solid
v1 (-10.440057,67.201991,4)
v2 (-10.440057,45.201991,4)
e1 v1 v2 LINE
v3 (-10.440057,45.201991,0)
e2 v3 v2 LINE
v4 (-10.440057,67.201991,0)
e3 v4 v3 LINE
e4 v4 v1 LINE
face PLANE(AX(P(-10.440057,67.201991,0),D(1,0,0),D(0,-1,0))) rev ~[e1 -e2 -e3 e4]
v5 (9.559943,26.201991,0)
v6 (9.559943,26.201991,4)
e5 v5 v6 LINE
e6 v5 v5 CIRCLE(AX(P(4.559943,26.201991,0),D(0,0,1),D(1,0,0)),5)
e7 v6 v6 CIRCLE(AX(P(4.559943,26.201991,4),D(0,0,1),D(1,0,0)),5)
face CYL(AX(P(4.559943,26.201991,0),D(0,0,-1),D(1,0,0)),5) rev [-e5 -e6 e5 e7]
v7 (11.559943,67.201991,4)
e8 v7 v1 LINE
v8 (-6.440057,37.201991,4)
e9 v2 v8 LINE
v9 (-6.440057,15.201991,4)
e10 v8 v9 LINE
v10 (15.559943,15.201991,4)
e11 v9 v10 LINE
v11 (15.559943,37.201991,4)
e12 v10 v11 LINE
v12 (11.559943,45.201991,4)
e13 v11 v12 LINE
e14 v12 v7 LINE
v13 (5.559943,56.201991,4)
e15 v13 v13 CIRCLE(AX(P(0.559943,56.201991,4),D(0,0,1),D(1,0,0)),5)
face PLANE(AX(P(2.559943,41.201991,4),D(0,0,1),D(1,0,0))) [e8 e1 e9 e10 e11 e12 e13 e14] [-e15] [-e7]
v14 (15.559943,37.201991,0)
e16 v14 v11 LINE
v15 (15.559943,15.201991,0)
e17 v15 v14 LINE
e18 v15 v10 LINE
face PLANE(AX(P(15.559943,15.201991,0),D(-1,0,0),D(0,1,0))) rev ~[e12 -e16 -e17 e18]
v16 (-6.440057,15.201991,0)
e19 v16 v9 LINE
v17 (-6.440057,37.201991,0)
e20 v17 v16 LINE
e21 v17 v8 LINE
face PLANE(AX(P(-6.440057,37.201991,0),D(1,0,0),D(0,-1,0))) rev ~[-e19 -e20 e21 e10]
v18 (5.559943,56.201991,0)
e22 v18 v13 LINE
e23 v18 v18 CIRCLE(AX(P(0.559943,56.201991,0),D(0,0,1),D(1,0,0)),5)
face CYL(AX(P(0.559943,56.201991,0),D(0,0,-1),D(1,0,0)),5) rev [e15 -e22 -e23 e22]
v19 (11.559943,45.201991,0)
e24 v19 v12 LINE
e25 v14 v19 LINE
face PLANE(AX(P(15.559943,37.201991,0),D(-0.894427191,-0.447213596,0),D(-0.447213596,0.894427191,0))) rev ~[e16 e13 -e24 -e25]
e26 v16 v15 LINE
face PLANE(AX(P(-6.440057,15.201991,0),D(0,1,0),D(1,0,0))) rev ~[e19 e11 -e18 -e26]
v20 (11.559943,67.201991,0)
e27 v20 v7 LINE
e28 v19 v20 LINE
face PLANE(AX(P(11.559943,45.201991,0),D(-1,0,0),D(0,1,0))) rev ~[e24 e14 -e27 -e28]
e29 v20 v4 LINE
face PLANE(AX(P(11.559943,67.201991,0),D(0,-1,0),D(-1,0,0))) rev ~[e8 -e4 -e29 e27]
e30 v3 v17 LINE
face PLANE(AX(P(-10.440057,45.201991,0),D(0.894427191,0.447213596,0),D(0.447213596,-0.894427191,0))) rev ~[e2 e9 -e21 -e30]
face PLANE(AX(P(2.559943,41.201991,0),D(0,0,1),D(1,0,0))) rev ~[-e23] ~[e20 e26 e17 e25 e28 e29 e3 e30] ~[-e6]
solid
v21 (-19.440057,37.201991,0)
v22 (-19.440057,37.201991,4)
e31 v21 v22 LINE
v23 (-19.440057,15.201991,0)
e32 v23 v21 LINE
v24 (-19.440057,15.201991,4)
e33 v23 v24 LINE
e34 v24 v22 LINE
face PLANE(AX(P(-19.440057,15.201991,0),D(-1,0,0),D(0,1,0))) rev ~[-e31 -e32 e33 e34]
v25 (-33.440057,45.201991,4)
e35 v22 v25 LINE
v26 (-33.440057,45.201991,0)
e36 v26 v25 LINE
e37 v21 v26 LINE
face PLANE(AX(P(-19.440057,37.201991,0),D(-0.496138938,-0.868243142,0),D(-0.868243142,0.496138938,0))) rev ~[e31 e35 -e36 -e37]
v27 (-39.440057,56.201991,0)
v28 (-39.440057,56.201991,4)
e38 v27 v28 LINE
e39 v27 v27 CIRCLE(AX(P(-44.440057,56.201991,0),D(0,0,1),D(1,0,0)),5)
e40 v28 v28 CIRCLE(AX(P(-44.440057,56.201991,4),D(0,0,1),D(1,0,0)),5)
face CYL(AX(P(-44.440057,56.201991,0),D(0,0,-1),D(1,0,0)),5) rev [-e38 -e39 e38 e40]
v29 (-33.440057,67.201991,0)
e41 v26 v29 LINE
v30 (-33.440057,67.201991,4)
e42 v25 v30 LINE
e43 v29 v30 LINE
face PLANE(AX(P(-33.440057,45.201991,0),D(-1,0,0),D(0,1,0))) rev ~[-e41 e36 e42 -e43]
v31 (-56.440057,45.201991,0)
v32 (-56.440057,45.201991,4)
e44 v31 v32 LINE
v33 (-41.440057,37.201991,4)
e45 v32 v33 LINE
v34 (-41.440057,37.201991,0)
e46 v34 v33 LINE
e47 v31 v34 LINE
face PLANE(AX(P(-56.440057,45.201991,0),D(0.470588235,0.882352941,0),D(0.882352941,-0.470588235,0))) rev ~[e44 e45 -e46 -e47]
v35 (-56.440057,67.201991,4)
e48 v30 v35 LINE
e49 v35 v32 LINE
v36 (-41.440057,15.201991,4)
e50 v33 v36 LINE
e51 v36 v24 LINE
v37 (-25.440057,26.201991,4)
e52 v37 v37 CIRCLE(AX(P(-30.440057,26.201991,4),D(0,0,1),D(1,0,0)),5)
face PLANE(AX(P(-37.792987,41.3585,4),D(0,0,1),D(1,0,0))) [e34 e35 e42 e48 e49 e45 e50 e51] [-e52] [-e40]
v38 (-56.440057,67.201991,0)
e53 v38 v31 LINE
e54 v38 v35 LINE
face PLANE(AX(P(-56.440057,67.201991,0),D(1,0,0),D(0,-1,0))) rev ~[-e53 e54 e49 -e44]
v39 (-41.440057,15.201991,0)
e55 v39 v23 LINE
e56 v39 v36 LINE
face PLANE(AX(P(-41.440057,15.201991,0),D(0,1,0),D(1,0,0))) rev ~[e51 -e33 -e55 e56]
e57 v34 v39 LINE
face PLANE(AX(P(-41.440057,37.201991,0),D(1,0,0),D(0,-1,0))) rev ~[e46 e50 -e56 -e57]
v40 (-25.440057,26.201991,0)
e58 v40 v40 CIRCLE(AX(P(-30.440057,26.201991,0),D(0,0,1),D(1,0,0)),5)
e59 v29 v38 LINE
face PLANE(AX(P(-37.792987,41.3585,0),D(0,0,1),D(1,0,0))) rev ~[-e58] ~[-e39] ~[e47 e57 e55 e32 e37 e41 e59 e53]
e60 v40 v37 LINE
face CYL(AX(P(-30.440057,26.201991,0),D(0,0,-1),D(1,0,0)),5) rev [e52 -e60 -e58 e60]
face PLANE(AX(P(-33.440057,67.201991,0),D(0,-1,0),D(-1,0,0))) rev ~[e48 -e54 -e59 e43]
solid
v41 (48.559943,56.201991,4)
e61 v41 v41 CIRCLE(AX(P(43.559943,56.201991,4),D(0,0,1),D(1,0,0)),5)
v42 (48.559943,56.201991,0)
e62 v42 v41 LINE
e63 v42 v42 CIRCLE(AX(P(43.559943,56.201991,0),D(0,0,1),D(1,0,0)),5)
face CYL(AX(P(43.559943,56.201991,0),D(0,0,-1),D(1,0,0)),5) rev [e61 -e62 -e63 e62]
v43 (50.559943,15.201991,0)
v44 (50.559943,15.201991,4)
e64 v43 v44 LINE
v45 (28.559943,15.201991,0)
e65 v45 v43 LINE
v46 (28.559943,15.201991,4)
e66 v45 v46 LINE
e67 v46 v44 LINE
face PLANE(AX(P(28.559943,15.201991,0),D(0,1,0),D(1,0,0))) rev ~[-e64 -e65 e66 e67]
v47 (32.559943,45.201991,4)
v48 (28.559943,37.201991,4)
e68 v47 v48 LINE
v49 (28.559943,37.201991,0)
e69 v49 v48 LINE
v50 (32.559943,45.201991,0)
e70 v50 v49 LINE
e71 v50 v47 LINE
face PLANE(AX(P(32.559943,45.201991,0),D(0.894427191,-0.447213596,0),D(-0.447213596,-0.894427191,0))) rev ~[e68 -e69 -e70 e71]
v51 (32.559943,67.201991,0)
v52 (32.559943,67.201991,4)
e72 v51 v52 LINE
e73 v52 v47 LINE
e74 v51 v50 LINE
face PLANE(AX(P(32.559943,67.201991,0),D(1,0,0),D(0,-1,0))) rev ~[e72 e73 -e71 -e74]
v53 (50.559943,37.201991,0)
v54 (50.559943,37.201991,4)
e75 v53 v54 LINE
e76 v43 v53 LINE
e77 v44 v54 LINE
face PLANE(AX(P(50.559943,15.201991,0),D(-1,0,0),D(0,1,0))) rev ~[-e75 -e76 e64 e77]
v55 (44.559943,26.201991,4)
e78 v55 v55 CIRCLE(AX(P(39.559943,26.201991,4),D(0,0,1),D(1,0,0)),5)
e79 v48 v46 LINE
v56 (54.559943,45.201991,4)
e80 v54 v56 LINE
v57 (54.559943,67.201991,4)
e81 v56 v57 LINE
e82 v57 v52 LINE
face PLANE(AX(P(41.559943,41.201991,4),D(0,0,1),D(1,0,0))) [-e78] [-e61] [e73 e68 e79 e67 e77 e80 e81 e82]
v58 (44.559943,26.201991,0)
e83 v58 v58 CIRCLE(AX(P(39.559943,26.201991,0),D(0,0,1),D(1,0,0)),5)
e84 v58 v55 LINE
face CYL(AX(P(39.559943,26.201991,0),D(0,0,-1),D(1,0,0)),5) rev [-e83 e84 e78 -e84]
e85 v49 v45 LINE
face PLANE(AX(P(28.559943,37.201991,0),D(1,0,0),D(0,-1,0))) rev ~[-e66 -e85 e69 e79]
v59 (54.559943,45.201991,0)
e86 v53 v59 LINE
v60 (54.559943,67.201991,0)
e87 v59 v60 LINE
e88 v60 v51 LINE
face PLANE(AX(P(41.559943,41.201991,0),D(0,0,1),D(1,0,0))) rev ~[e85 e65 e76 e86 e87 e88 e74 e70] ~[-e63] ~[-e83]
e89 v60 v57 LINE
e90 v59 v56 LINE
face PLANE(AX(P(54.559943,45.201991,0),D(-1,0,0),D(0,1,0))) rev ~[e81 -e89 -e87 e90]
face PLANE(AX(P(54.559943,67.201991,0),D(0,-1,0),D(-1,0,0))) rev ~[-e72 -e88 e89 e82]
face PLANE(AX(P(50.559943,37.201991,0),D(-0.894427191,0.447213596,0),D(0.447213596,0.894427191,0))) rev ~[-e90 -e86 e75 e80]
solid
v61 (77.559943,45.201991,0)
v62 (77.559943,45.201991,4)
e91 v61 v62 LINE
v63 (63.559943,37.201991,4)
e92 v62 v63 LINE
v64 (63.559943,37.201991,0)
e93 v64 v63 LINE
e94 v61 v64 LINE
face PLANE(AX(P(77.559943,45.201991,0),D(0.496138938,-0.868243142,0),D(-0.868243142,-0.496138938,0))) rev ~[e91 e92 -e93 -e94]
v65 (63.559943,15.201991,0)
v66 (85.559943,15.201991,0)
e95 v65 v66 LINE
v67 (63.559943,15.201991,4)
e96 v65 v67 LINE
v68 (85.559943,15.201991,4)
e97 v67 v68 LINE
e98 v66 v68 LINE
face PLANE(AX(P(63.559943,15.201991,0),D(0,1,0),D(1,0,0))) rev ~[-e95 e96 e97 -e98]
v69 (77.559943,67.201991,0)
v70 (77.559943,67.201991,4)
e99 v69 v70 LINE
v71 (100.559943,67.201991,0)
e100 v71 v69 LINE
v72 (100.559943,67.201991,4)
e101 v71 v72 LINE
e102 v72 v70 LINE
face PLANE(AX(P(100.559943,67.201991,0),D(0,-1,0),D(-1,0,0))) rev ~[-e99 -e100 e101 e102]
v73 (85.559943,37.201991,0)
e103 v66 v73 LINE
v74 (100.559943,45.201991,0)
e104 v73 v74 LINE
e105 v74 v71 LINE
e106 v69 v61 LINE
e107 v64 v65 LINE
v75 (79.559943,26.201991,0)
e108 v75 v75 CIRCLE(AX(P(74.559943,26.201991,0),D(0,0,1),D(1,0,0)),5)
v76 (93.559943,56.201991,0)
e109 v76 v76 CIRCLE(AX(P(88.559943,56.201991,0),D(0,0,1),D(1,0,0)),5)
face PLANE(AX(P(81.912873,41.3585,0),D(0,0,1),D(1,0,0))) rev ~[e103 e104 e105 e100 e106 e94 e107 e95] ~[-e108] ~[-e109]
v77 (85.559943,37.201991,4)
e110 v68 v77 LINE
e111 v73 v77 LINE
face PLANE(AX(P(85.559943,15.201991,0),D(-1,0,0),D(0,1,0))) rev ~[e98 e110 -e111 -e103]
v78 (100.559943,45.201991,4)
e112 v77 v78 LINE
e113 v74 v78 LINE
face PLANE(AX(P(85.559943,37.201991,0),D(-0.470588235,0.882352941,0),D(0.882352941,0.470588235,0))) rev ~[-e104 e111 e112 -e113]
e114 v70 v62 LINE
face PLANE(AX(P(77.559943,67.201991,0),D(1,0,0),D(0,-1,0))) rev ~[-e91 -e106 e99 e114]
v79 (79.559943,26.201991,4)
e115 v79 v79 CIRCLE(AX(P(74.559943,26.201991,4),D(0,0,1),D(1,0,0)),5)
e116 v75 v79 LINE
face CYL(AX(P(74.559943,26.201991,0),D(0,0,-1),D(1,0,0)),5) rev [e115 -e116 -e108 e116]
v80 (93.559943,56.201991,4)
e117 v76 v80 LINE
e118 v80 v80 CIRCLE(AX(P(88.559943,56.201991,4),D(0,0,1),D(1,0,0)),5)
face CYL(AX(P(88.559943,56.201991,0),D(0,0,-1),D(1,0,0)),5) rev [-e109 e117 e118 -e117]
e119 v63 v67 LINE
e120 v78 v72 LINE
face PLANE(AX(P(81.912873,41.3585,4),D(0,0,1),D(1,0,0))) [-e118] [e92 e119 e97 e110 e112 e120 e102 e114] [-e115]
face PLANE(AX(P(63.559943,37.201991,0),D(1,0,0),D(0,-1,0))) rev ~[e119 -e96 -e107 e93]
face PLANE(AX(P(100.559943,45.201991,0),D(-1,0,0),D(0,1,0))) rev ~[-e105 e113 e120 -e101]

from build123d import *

# Parameters (mm, degrees)
F0_R     = 5
F1_DEPTH = 4


# Not quite as in the source:
# - a feature names something its author has since deleted; it is built from what else it names


with BuildPart() as f1:
    # F0 (on Top) → F1 (new body)
    with BuildSketch(Plane.XY):
        Polygon((-33.4400572926, 67.2019907534), (-56.4400572926, 67.2019907534), (-56.4400572926, 45.2019907534), (-41.4400572926, 37.2019907534), (-41.4400572926, 15.2019907534), (-19.4400572926, 15.2019907534), (-19.4400572926, 37.2019907534), (-33.4400572926, 45.2019907534), align=None)
        with Locations((-30.4400572926, 26.2019907534)):
            Circle(F0_R, mode=Mode.SUBTRACT)
        with Locations((-44.4400572926, 56.2019907534)):
            Circle(F0_R, mode=Mode.SUBTRACT)
    extrude(amount=F1_DEPTH)


with BuildPart() as f1b:
    # F0 (on Top) → F1, piece 2 (new body)
    with BuildSketch(Plane.XY):
        Polygon((11.5599427074, 67.2019907534), (-10.4400572926, 67.2019907534), (-10.4400572926, 45.2019907534), (-6.4400572926, 37.2019907534), (-6.4400572926, 15.2019907534), (15.5599427074, 15.2019907534), (15.5599427074, 25.1399558038), (15.5599427074, 37.2019907534), (11.5599427074, 45.2019907534), align=None)
        with Locations((4.5599427074, 26.2019907534)):
            Circle(F0_R, mode=Mode.SUBTRACT)
        with Locations((0.5599427074, 56.2019907534)):
            Circle(F0_R, mode=Mode.SUBTRACT)
    extrude(amount=F1_DEPTH)


with BuildPart() as f1c:
    # F0 (on Top) → F1, piece 3 (new body)
    with BuildSketch(Plane.XY):
        Polygon((28.5599427074, 15.2019907534), (50.5599427074, 15.2019907534), (50.5599427074, 37.2019907534), (54.5599427074, 45.2019907534), (54.5599427074, 67.2019907534), (32.5599427074, 67.2019907534), (32.5599427074, 45.2019907534), (28.5599427074, 37.2019907534), align=None)
        with Locations((39.5599427074, 26.2019907534)):
            Circle(F0_R, mode=Mode.SUBTRACT)
        with Locations((43.5599427074, 56.2019907534)):
            Circle(F0_R, mode=Mode.SUBTRACT)
    extrude(amount=F1_DEPTH)


with BuildPart() as f1d:
    # F0 (on Top) → F1, piece 4 (new body)
    with BuildSketch(Plane.XY):
        Polygon((77.5599427074, 67.2019907534), (77.5599427074, 45.2019907534), (63.5599427074, 37.2019907534), (63.5599427074, 15.2019907534), (85.5599427074, 15.2019907534), (85.5599427074, 37.2019907534), (100.5599427074, 45.2019907534), (100.5599427074, 67.2019907534), align=None)
        with Locations((74.5599427074, 26.2019907534)):
            Circle(F0_R, mode=Mode.SUBTRACT)
        with Locations((88.5599427074, 56.2019907534)):
            Circle(F0_R, mode=Mode.SUBTRACT)
    extrude(amount=F1_DEPTH)


solid = Compound([f1.part, f1b.part, f1c.part, f1d.part])
